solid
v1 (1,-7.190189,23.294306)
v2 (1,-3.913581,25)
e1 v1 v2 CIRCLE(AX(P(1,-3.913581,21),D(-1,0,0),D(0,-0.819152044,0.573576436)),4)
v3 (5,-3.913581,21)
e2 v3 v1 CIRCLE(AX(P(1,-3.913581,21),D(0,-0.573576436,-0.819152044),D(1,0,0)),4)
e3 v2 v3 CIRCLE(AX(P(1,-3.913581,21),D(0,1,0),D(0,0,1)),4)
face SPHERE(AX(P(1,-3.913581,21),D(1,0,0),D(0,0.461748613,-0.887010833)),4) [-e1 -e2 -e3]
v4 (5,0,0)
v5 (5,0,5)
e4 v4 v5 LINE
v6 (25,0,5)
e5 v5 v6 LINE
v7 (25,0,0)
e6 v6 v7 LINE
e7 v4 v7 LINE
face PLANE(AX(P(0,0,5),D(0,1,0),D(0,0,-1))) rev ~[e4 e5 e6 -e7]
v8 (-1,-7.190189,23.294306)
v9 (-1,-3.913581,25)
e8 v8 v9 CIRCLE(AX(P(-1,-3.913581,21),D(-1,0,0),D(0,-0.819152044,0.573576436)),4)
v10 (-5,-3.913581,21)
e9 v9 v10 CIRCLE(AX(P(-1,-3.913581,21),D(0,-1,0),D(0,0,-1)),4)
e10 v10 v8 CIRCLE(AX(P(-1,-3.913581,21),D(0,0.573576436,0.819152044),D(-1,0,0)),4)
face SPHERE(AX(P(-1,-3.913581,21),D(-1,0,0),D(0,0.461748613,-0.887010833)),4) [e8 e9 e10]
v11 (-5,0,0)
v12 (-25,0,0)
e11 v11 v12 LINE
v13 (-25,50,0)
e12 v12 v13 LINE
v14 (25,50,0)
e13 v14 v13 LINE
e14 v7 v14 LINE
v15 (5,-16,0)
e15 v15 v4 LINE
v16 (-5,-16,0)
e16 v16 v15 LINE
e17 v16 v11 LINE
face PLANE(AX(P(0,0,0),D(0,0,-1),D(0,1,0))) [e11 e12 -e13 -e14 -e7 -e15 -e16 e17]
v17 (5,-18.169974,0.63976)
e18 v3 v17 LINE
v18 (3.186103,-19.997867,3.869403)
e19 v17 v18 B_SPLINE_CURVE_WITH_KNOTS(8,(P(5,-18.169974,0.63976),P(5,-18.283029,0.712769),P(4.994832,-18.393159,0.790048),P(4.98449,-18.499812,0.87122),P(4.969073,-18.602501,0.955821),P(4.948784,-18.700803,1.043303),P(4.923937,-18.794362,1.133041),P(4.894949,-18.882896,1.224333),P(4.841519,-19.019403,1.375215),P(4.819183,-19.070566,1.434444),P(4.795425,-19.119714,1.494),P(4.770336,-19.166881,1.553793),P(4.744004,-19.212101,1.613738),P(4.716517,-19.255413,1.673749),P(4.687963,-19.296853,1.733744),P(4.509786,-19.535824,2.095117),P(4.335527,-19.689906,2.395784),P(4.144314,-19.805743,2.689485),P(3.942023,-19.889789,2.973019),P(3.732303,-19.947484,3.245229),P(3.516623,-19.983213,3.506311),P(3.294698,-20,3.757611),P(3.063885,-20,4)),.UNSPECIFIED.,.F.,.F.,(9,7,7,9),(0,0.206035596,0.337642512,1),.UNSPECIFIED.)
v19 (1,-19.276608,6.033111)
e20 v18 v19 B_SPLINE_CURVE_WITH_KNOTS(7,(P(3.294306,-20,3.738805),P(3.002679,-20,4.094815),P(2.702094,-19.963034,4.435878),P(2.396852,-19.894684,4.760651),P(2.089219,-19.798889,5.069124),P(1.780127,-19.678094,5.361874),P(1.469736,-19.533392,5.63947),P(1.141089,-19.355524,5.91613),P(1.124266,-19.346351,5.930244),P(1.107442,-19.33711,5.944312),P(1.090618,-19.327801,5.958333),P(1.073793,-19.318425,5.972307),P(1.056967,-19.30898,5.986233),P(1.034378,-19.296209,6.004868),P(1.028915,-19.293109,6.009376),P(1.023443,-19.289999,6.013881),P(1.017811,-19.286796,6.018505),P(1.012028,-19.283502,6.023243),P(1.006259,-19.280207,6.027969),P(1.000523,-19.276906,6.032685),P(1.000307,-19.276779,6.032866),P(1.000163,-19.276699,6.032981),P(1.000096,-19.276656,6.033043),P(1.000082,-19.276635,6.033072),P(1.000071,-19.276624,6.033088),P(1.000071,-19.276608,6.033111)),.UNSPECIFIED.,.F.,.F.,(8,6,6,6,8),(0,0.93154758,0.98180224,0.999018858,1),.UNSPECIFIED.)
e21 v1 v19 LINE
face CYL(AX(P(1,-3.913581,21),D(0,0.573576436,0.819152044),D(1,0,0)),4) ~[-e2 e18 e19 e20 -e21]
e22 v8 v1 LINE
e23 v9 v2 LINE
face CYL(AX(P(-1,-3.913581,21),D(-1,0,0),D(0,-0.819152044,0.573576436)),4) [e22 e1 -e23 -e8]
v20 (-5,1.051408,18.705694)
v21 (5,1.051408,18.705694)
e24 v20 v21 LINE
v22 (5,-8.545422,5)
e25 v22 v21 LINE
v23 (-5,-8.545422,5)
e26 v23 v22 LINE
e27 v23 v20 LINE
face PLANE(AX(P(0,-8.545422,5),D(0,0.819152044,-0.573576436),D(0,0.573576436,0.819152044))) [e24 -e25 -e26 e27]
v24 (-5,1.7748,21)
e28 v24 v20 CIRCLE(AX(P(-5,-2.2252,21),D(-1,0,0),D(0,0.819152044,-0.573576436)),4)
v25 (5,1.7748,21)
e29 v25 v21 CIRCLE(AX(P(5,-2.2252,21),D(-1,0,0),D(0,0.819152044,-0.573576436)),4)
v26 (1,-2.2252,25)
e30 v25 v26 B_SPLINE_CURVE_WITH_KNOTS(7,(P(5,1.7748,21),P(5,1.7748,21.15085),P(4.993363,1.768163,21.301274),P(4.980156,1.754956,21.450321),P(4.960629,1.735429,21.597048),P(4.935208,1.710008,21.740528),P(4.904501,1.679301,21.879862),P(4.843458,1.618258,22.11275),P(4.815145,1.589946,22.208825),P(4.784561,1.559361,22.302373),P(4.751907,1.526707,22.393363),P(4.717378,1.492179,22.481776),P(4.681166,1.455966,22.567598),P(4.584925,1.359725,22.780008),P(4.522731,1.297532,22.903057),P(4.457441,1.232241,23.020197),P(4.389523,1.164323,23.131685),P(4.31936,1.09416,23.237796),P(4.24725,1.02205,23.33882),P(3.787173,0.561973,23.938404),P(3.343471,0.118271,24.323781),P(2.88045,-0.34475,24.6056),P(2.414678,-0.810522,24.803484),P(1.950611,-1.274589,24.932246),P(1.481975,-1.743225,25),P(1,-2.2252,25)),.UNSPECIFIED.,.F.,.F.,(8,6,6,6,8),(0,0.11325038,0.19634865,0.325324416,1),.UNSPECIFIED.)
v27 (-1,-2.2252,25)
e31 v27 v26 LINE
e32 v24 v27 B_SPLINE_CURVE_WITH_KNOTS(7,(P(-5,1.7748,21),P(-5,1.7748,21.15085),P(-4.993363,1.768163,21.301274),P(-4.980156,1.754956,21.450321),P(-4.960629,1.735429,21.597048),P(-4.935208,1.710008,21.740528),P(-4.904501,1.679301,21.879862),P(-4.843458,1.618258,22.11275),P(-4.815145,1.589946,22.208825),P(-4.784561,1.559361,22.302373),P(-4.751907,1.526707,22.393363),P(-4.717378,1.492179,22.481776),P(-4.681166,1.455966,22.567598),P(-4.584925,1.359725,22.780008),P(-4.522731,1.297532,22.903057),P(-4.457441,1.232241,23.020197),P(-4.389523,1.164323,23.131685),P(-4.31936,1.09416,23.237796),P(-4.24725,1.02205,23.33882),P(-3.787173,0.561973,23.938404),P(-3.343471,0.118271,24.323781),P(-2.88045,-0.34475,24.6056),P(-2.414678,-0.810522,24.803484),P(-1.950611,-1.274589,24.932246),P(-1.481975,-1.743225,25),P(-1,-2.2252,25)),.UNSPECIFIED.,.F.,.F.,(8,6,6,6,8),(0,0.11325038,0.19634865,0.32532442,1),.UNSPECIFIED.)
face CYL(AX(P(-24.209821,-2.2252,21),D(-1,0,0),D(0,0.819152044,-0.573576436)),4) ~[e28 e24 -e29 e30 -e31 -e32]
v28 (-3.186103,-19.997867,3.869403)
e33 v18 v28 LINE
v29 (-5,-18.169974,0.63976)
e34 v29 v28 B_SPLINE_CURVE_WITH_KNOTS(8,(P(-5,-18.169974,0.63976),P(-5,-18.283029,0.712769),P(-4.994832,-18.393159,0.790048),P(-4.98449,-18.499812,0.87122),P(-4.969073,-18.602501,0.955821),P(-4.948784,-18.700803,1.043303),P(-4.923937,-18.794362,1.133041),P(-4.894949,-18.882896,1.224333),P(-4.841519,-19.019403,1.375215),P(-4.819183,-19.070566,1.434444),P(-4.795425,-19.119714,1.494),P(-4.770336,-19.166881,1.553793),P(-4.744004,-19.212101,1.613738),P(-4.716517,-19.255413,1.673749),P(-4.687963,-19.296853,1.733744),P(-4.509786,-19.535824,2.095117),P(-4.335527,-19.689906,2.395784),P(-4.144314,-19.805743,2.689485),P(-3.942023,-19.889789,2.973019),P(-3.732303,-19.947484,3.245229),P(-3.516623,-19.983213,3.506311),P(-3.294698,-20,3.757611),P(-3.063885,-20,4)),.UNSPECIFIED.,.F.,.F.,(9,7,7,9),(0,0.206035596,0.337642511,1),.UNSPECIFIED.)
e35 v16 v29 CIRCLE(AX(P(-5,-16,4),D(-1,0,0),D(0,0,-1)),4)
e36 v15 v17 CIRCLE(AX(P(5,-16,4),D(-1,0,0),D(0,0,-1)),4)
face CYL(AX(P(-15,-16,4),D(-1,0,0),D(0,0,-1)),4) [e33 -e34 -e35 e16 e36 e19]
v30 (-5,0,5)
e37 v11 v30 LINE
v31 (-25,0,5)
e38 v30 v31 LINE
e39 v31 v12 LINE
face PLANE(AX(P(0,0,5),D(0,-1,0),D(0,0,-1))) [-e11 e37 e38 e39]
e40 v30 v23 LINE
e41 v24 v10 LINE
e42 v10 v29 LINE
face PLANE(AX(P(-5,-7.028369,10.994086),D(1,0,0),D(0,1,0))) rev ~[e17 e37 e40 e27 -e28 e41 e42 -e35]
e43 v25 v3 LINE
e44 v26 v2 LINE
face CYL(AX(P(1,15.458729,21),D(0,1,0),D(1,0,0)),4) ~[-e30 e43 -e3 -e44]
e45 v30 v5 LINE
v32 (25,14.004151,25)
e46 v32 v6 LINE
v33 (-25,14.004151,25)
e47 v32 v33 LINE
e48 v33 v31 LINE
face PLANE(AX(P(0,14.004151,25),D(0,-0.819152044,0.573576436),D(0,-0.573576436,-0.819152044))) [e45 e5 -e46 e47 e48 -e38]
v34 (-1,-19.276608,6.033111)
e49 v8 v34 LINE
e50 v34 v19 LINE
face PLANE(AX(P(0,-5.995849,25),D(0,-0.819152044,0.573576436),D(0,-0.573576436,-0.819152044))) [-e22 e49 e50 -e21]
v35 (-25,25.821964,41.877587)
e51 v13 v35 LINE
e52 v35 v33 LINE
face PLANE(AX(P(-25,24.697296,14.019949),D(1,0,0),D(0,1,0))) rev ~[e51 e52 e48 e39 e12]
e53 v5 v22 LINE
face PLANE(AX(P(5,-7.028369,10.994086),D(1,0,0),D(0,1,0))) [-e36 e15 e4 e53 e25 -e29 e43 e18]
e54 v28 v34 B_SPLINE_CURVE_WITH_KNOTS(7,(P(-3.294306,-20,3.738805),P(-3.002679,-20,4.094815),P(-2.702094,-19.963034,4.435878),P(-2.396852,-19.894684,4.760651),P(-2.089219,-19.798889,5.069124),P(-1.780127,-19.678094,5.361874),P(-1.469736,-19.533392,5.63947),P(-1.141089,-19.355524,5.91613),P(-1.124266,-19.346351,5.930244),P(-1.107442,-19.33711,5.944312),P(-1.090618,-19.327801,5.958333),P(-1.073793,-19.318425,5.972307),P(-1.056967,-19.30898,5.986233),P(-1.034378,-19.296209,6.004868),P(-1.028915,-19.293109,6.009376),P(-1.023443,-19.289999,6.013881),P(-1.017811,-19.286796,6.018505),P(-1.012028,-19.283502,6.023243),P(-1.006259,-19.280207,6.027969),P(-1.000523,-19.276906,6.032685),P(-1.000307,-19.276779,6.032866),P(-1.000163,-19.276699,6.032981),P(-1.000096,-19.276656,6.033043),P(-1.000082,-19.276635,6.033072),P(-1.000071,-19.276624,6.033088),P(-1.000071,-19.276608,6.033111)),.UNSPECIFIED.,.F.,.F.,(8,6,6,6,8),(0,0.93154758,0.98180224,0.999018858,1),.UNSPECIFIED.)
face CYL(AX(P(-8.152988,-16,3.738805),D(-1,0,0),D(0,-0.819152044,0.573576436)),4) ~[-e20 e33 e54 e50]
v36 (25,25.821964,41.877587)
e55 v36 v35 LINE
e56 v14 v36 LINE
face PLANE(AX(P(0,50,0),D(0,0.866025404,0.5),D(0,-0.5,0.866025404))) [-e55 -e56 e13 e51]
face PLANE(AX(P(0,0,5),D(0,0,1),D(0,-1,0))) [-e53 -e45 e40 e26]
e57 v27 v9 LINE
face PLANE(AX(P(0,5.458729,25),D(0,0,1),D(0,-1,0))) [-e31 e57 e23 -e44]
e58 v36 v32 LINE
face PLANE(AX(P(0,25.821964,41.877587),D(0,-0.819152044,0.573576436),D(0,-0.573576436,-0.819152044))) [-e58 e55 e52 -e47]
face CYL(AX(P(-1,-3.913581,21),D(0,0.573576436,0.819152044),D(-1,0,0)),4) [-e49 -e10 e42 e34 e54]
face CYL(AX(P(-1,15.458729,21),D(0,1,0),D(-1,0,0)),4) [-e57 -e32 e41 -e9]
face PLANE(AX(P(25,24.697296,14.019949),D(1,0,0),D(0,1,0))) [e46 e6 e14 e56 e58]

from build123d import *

# Parameters (mm, degrees)
F1_DEPTH      = 5
F2_DEPTH      = 25
F2_DEPTH_BACK = 25
F3_T1_DEPTH   = 32.333223573
F3_T3_DEPTH   = 16.3059757776
F3_T5_DEPTH   = 2
F3_T7_DEPTH   = 48.4196425394
F3_T9_DEPTH   = 30
F3_T14_DEPTH  = 4.08
F3_T20_DEPTH  = 4.08
F3_T26_DEPTH  = 19.3723096765
F3_T31_DEPTH  = 19.3723096765


# Not quite as in the source:
# - a fillet or chamfer that OpenCascade refuses, or shapes differently, is made with other operations: its cross-section is extruded or revolved along the edge and cut away or added


with BuildPart() as f1:
    # F0 (on Right) → F1 (new body, symmetric)
    with BuildSketch(Plane.YZ):
        Polygon((0, 0), (0, 5), (-8.5454221213, 5), (5.4587286429, 25), (-5.9958492358, 25), (-20, 5), (-20, 0), align=None)
    extrude(amount=F1_DEPTH, both=True)

    # F0 (on Right) → F2 (join, two sides)
    with BuildSketch(Plane.YZ) as f2_sk:
        Polygon((14.0041507642, 25), (0, 5), (0, 0), (50, 0), (25.8219641147, 41.8775865806), align=None)
    extrude(amount=F2_DEPTH)
    extrude(f2_sk.sketch, amount=-F2_DEPTH_BACK)

    # F3: fillet of radius 4 on 8 edges, made by hand

    # F3_s2 → F3_t1 (cut)
    with BuildSketch(Plane(origin=(0, 8.5792437745, 12.2524298959), x_dir=(1, 0, 0), z_dir=(0, -0.5735764364, -0.8191520443))):
        with BuildLine():
            ThreePointArc((-5, 15.2509230675), (-3.8284271247, 18.0793501923), (-1, 19.2509230675))
            Line((-1, 19.2509230675), (-5, 19.2509230675))
            Line((-5, 19.2509230675), (-5, 15.2509230675))
        make_face()
        with BuildLine():
            ThreePointArc((5, 15.2509230675), (3.8284271247, 18.0793501923), (1, 19.2509230675))
            Line((1, 19.2509230675), (5, 19.2509230675))
            Line((5, 19.2509230675), (5, 15.2509230675))
        make_face()
    extrude(amount=F3_T1_DEPTH, mode=Mode.SUBTRACT)

    # F3_s4 → F3_t3 (cut)
    with BuildSketch(Plane.YZ.offset(-8.1529878888)):
        with BuildLine():
            ThreePointArc((-19.2766081772, 6.0331105899), (-19.814867803, 4.9416280425), (-20, 3.7388048445))
            Line((-20, 3.7388048445), (-20, 5))
            Line((-20, 5), (-19.2766081772, 6.0331105899))
        make_face()
    extrude(amount=F3_T3_DEPTH, mode=Mode.SUBTRACT)

    # F3_s6 → F3_t5 (cut)
    with BuildSketch(Plane.YZ.offset(-1)):
        with BuildLine():
            ThreePointArc((-7.1901892108, 23.2943057454), (-5.7605754865, 24.5480433327), (-3.9135810336, 25))
            Line((-3.9135810336, 25), (-5.9958492358, 25))
            Line((-5.9958492358, 25), (-7.1901892108, 23.2943057454))
        make_face()
    extrude(amount=F3_T5_DEPTH, mode=Mode.SUBTRACT)

    # F3_s8 → F3_t7 (cut)
    with BuildSketch(Plane.YZ.offset(-24.2098212697)):
        with BuildLine():
            ThreePointArc((1.0514083121, 18.7056942546), (1.3228434677, 22.8469944529), (-2.225199865, 25))
            Line((-2.225199865, 25), (5.4587286429, 25))
            Line((5.4587286429, 25), (1.0514083121, 18.7056942546))
        make_face()
    extrude(amount=F3_T7_DEPTH, mode=Mode.SUBTRACT)

    # F3_s10 → F3_t9 (cut)
    with BuildSketch(Plane.YZ.offset(-15)):
        with BuildLine():
            ThreePointArc((-16, 0), (-18.8284271247, 1.1715728753), (-20, 4))
            Line((-20, 4), (-20, 0))
            Line((-20, 0), (-16, 0))
        make_face()
    extrude(amount=F3_T9_DEPTH, mode=Mode.SUBTRACT)


with BuildPart() as f3_tool12:
    # F3_s13 → F3_t14 (new body)
    with BuildSketch(Plane.YZ.offset(-1)):
        Polygon((-3.9135810336, 21), (-7.2557213743, 23.3401918603), (-6.0374945998, 25.08), (-3.9135810336, 25.08), align=None)
    extrude(amount=-F3_T14_DEPTH)

    # F3_s15 → F3_t16 (revolve, cut)
    with BuildSketch(Plane(origin=(-1, -3.9135810336, 21), x_dir=(0, 0.4617486132, -0.8870108332), z_dir=(0, 0.8870108332, 0.4617486132))):
        with BuildLine():
            ThreePointArc((0, -4), (4, 0), (0, 4))
            Line((0, 4), (0, -4))
        make_face()
    revolve(axis=Axis((-1, -3.9135810336, 21), (-1, 0, 0)), mode=Mode.SUBTRACT)


with BuildPart() as f1_1:
    add(f1.part)

    # F3_t11: cut F3_tool12
    add(f3_tool12.part, mode=Mode.SUBTRACT)


with BuildPart() as f3_tool18:
    # F3_s19 → F3_t20 (new body)
    with BuildSketch(Plane.YZ.offset(1)):
        Polygon((-3.9135810336, 21), (-7.2557213743, 23.3401918603), (-6.0374945998, 25.08), (-3.9135810336, 25.08), align=None)
    extrude(amount=F3_T20_DEPTH)

    # F3_s21 → F3_t22 (revolve, cut)
    with BuildSketch(Plane(origin=(1, -3.9135810336, 21), x_dir=(0, 0.4617486132, -0.8870108332), z_dir=(0, -0.8870108332, -0.4617486132))):
        with BuildLine():
            ThreePointArc((0, -4), (4, 0), (0, 4))
            Line((0, 4), (0, -4))
        make_face()
    revolve(axis=Axis((1, -3.9135810336, 21), (1, 0, 0)), mode=Mode.SUBTRACT)


with BuildPart() as f1_2:
    add(f1_1.part)

    # F3_t17: cut F3_tool18
    add(f3_tool18.part, mode=Mode.SUBTRACT)


with BuildPart() as f3_tool24:
    # F3_s25 → F3_t26 (new body)
    with BuildSketch(Plane.XZ.offset(-15.4587286429)):
        with BuildLine():
            ThreePointArc((-5, 21), (-3.8284271247, 23.8284271247), (-1, 25))
            Line((-1, 25), (-5, 25))
            Line((-5, 25), (-5, 21))
        make_face()
    extrude(amount=F3_T26_DEPTH)

    split(bisect_by=Plane(origin=(0, -8.083295862, 5.6599846961), x_dir=(1, 0, 0), z_dir=(0, -0.8191520443, 0.5735764364)), keep=Keep.TOP)


with BuildPart() as f1_3:
    add(f1_2.part)

    # F3_t23: cut F3_tool24
    add(f3_tool24.part, mode=Mode.SUBTRACT)


with BuildPart() as f3_tool29:
    # F3_s30 → F3_t31 (new body)
    with BuildSketch(Plane.XZ.offset(-15.4587286429)):
        with BuildLine():
            ThreePointArc((5, 21), (3.8284271247, 23.8284271247), (1, 25))
            Line((1, 25), (5, 25))
            Line((5, 25), (5, 21))
        make_face()
    extrude(amount=F3_T31_DEPTH)

    split(bisect_by=Plane(origin=(0, -8.083295862, 5.6599846961), x_dir=(1, 0, 0), z_dir=(0, -0.8191520443, 0.5735764364)), keep=Keep.TOP)


with BuildPart() as f1_4:
    add(f1_3.part)

    # F3_t28: cut F3_tool29
    add(f3_tool29.part, mode=Mode.SUBTRACT)


solid = f1_4.part
